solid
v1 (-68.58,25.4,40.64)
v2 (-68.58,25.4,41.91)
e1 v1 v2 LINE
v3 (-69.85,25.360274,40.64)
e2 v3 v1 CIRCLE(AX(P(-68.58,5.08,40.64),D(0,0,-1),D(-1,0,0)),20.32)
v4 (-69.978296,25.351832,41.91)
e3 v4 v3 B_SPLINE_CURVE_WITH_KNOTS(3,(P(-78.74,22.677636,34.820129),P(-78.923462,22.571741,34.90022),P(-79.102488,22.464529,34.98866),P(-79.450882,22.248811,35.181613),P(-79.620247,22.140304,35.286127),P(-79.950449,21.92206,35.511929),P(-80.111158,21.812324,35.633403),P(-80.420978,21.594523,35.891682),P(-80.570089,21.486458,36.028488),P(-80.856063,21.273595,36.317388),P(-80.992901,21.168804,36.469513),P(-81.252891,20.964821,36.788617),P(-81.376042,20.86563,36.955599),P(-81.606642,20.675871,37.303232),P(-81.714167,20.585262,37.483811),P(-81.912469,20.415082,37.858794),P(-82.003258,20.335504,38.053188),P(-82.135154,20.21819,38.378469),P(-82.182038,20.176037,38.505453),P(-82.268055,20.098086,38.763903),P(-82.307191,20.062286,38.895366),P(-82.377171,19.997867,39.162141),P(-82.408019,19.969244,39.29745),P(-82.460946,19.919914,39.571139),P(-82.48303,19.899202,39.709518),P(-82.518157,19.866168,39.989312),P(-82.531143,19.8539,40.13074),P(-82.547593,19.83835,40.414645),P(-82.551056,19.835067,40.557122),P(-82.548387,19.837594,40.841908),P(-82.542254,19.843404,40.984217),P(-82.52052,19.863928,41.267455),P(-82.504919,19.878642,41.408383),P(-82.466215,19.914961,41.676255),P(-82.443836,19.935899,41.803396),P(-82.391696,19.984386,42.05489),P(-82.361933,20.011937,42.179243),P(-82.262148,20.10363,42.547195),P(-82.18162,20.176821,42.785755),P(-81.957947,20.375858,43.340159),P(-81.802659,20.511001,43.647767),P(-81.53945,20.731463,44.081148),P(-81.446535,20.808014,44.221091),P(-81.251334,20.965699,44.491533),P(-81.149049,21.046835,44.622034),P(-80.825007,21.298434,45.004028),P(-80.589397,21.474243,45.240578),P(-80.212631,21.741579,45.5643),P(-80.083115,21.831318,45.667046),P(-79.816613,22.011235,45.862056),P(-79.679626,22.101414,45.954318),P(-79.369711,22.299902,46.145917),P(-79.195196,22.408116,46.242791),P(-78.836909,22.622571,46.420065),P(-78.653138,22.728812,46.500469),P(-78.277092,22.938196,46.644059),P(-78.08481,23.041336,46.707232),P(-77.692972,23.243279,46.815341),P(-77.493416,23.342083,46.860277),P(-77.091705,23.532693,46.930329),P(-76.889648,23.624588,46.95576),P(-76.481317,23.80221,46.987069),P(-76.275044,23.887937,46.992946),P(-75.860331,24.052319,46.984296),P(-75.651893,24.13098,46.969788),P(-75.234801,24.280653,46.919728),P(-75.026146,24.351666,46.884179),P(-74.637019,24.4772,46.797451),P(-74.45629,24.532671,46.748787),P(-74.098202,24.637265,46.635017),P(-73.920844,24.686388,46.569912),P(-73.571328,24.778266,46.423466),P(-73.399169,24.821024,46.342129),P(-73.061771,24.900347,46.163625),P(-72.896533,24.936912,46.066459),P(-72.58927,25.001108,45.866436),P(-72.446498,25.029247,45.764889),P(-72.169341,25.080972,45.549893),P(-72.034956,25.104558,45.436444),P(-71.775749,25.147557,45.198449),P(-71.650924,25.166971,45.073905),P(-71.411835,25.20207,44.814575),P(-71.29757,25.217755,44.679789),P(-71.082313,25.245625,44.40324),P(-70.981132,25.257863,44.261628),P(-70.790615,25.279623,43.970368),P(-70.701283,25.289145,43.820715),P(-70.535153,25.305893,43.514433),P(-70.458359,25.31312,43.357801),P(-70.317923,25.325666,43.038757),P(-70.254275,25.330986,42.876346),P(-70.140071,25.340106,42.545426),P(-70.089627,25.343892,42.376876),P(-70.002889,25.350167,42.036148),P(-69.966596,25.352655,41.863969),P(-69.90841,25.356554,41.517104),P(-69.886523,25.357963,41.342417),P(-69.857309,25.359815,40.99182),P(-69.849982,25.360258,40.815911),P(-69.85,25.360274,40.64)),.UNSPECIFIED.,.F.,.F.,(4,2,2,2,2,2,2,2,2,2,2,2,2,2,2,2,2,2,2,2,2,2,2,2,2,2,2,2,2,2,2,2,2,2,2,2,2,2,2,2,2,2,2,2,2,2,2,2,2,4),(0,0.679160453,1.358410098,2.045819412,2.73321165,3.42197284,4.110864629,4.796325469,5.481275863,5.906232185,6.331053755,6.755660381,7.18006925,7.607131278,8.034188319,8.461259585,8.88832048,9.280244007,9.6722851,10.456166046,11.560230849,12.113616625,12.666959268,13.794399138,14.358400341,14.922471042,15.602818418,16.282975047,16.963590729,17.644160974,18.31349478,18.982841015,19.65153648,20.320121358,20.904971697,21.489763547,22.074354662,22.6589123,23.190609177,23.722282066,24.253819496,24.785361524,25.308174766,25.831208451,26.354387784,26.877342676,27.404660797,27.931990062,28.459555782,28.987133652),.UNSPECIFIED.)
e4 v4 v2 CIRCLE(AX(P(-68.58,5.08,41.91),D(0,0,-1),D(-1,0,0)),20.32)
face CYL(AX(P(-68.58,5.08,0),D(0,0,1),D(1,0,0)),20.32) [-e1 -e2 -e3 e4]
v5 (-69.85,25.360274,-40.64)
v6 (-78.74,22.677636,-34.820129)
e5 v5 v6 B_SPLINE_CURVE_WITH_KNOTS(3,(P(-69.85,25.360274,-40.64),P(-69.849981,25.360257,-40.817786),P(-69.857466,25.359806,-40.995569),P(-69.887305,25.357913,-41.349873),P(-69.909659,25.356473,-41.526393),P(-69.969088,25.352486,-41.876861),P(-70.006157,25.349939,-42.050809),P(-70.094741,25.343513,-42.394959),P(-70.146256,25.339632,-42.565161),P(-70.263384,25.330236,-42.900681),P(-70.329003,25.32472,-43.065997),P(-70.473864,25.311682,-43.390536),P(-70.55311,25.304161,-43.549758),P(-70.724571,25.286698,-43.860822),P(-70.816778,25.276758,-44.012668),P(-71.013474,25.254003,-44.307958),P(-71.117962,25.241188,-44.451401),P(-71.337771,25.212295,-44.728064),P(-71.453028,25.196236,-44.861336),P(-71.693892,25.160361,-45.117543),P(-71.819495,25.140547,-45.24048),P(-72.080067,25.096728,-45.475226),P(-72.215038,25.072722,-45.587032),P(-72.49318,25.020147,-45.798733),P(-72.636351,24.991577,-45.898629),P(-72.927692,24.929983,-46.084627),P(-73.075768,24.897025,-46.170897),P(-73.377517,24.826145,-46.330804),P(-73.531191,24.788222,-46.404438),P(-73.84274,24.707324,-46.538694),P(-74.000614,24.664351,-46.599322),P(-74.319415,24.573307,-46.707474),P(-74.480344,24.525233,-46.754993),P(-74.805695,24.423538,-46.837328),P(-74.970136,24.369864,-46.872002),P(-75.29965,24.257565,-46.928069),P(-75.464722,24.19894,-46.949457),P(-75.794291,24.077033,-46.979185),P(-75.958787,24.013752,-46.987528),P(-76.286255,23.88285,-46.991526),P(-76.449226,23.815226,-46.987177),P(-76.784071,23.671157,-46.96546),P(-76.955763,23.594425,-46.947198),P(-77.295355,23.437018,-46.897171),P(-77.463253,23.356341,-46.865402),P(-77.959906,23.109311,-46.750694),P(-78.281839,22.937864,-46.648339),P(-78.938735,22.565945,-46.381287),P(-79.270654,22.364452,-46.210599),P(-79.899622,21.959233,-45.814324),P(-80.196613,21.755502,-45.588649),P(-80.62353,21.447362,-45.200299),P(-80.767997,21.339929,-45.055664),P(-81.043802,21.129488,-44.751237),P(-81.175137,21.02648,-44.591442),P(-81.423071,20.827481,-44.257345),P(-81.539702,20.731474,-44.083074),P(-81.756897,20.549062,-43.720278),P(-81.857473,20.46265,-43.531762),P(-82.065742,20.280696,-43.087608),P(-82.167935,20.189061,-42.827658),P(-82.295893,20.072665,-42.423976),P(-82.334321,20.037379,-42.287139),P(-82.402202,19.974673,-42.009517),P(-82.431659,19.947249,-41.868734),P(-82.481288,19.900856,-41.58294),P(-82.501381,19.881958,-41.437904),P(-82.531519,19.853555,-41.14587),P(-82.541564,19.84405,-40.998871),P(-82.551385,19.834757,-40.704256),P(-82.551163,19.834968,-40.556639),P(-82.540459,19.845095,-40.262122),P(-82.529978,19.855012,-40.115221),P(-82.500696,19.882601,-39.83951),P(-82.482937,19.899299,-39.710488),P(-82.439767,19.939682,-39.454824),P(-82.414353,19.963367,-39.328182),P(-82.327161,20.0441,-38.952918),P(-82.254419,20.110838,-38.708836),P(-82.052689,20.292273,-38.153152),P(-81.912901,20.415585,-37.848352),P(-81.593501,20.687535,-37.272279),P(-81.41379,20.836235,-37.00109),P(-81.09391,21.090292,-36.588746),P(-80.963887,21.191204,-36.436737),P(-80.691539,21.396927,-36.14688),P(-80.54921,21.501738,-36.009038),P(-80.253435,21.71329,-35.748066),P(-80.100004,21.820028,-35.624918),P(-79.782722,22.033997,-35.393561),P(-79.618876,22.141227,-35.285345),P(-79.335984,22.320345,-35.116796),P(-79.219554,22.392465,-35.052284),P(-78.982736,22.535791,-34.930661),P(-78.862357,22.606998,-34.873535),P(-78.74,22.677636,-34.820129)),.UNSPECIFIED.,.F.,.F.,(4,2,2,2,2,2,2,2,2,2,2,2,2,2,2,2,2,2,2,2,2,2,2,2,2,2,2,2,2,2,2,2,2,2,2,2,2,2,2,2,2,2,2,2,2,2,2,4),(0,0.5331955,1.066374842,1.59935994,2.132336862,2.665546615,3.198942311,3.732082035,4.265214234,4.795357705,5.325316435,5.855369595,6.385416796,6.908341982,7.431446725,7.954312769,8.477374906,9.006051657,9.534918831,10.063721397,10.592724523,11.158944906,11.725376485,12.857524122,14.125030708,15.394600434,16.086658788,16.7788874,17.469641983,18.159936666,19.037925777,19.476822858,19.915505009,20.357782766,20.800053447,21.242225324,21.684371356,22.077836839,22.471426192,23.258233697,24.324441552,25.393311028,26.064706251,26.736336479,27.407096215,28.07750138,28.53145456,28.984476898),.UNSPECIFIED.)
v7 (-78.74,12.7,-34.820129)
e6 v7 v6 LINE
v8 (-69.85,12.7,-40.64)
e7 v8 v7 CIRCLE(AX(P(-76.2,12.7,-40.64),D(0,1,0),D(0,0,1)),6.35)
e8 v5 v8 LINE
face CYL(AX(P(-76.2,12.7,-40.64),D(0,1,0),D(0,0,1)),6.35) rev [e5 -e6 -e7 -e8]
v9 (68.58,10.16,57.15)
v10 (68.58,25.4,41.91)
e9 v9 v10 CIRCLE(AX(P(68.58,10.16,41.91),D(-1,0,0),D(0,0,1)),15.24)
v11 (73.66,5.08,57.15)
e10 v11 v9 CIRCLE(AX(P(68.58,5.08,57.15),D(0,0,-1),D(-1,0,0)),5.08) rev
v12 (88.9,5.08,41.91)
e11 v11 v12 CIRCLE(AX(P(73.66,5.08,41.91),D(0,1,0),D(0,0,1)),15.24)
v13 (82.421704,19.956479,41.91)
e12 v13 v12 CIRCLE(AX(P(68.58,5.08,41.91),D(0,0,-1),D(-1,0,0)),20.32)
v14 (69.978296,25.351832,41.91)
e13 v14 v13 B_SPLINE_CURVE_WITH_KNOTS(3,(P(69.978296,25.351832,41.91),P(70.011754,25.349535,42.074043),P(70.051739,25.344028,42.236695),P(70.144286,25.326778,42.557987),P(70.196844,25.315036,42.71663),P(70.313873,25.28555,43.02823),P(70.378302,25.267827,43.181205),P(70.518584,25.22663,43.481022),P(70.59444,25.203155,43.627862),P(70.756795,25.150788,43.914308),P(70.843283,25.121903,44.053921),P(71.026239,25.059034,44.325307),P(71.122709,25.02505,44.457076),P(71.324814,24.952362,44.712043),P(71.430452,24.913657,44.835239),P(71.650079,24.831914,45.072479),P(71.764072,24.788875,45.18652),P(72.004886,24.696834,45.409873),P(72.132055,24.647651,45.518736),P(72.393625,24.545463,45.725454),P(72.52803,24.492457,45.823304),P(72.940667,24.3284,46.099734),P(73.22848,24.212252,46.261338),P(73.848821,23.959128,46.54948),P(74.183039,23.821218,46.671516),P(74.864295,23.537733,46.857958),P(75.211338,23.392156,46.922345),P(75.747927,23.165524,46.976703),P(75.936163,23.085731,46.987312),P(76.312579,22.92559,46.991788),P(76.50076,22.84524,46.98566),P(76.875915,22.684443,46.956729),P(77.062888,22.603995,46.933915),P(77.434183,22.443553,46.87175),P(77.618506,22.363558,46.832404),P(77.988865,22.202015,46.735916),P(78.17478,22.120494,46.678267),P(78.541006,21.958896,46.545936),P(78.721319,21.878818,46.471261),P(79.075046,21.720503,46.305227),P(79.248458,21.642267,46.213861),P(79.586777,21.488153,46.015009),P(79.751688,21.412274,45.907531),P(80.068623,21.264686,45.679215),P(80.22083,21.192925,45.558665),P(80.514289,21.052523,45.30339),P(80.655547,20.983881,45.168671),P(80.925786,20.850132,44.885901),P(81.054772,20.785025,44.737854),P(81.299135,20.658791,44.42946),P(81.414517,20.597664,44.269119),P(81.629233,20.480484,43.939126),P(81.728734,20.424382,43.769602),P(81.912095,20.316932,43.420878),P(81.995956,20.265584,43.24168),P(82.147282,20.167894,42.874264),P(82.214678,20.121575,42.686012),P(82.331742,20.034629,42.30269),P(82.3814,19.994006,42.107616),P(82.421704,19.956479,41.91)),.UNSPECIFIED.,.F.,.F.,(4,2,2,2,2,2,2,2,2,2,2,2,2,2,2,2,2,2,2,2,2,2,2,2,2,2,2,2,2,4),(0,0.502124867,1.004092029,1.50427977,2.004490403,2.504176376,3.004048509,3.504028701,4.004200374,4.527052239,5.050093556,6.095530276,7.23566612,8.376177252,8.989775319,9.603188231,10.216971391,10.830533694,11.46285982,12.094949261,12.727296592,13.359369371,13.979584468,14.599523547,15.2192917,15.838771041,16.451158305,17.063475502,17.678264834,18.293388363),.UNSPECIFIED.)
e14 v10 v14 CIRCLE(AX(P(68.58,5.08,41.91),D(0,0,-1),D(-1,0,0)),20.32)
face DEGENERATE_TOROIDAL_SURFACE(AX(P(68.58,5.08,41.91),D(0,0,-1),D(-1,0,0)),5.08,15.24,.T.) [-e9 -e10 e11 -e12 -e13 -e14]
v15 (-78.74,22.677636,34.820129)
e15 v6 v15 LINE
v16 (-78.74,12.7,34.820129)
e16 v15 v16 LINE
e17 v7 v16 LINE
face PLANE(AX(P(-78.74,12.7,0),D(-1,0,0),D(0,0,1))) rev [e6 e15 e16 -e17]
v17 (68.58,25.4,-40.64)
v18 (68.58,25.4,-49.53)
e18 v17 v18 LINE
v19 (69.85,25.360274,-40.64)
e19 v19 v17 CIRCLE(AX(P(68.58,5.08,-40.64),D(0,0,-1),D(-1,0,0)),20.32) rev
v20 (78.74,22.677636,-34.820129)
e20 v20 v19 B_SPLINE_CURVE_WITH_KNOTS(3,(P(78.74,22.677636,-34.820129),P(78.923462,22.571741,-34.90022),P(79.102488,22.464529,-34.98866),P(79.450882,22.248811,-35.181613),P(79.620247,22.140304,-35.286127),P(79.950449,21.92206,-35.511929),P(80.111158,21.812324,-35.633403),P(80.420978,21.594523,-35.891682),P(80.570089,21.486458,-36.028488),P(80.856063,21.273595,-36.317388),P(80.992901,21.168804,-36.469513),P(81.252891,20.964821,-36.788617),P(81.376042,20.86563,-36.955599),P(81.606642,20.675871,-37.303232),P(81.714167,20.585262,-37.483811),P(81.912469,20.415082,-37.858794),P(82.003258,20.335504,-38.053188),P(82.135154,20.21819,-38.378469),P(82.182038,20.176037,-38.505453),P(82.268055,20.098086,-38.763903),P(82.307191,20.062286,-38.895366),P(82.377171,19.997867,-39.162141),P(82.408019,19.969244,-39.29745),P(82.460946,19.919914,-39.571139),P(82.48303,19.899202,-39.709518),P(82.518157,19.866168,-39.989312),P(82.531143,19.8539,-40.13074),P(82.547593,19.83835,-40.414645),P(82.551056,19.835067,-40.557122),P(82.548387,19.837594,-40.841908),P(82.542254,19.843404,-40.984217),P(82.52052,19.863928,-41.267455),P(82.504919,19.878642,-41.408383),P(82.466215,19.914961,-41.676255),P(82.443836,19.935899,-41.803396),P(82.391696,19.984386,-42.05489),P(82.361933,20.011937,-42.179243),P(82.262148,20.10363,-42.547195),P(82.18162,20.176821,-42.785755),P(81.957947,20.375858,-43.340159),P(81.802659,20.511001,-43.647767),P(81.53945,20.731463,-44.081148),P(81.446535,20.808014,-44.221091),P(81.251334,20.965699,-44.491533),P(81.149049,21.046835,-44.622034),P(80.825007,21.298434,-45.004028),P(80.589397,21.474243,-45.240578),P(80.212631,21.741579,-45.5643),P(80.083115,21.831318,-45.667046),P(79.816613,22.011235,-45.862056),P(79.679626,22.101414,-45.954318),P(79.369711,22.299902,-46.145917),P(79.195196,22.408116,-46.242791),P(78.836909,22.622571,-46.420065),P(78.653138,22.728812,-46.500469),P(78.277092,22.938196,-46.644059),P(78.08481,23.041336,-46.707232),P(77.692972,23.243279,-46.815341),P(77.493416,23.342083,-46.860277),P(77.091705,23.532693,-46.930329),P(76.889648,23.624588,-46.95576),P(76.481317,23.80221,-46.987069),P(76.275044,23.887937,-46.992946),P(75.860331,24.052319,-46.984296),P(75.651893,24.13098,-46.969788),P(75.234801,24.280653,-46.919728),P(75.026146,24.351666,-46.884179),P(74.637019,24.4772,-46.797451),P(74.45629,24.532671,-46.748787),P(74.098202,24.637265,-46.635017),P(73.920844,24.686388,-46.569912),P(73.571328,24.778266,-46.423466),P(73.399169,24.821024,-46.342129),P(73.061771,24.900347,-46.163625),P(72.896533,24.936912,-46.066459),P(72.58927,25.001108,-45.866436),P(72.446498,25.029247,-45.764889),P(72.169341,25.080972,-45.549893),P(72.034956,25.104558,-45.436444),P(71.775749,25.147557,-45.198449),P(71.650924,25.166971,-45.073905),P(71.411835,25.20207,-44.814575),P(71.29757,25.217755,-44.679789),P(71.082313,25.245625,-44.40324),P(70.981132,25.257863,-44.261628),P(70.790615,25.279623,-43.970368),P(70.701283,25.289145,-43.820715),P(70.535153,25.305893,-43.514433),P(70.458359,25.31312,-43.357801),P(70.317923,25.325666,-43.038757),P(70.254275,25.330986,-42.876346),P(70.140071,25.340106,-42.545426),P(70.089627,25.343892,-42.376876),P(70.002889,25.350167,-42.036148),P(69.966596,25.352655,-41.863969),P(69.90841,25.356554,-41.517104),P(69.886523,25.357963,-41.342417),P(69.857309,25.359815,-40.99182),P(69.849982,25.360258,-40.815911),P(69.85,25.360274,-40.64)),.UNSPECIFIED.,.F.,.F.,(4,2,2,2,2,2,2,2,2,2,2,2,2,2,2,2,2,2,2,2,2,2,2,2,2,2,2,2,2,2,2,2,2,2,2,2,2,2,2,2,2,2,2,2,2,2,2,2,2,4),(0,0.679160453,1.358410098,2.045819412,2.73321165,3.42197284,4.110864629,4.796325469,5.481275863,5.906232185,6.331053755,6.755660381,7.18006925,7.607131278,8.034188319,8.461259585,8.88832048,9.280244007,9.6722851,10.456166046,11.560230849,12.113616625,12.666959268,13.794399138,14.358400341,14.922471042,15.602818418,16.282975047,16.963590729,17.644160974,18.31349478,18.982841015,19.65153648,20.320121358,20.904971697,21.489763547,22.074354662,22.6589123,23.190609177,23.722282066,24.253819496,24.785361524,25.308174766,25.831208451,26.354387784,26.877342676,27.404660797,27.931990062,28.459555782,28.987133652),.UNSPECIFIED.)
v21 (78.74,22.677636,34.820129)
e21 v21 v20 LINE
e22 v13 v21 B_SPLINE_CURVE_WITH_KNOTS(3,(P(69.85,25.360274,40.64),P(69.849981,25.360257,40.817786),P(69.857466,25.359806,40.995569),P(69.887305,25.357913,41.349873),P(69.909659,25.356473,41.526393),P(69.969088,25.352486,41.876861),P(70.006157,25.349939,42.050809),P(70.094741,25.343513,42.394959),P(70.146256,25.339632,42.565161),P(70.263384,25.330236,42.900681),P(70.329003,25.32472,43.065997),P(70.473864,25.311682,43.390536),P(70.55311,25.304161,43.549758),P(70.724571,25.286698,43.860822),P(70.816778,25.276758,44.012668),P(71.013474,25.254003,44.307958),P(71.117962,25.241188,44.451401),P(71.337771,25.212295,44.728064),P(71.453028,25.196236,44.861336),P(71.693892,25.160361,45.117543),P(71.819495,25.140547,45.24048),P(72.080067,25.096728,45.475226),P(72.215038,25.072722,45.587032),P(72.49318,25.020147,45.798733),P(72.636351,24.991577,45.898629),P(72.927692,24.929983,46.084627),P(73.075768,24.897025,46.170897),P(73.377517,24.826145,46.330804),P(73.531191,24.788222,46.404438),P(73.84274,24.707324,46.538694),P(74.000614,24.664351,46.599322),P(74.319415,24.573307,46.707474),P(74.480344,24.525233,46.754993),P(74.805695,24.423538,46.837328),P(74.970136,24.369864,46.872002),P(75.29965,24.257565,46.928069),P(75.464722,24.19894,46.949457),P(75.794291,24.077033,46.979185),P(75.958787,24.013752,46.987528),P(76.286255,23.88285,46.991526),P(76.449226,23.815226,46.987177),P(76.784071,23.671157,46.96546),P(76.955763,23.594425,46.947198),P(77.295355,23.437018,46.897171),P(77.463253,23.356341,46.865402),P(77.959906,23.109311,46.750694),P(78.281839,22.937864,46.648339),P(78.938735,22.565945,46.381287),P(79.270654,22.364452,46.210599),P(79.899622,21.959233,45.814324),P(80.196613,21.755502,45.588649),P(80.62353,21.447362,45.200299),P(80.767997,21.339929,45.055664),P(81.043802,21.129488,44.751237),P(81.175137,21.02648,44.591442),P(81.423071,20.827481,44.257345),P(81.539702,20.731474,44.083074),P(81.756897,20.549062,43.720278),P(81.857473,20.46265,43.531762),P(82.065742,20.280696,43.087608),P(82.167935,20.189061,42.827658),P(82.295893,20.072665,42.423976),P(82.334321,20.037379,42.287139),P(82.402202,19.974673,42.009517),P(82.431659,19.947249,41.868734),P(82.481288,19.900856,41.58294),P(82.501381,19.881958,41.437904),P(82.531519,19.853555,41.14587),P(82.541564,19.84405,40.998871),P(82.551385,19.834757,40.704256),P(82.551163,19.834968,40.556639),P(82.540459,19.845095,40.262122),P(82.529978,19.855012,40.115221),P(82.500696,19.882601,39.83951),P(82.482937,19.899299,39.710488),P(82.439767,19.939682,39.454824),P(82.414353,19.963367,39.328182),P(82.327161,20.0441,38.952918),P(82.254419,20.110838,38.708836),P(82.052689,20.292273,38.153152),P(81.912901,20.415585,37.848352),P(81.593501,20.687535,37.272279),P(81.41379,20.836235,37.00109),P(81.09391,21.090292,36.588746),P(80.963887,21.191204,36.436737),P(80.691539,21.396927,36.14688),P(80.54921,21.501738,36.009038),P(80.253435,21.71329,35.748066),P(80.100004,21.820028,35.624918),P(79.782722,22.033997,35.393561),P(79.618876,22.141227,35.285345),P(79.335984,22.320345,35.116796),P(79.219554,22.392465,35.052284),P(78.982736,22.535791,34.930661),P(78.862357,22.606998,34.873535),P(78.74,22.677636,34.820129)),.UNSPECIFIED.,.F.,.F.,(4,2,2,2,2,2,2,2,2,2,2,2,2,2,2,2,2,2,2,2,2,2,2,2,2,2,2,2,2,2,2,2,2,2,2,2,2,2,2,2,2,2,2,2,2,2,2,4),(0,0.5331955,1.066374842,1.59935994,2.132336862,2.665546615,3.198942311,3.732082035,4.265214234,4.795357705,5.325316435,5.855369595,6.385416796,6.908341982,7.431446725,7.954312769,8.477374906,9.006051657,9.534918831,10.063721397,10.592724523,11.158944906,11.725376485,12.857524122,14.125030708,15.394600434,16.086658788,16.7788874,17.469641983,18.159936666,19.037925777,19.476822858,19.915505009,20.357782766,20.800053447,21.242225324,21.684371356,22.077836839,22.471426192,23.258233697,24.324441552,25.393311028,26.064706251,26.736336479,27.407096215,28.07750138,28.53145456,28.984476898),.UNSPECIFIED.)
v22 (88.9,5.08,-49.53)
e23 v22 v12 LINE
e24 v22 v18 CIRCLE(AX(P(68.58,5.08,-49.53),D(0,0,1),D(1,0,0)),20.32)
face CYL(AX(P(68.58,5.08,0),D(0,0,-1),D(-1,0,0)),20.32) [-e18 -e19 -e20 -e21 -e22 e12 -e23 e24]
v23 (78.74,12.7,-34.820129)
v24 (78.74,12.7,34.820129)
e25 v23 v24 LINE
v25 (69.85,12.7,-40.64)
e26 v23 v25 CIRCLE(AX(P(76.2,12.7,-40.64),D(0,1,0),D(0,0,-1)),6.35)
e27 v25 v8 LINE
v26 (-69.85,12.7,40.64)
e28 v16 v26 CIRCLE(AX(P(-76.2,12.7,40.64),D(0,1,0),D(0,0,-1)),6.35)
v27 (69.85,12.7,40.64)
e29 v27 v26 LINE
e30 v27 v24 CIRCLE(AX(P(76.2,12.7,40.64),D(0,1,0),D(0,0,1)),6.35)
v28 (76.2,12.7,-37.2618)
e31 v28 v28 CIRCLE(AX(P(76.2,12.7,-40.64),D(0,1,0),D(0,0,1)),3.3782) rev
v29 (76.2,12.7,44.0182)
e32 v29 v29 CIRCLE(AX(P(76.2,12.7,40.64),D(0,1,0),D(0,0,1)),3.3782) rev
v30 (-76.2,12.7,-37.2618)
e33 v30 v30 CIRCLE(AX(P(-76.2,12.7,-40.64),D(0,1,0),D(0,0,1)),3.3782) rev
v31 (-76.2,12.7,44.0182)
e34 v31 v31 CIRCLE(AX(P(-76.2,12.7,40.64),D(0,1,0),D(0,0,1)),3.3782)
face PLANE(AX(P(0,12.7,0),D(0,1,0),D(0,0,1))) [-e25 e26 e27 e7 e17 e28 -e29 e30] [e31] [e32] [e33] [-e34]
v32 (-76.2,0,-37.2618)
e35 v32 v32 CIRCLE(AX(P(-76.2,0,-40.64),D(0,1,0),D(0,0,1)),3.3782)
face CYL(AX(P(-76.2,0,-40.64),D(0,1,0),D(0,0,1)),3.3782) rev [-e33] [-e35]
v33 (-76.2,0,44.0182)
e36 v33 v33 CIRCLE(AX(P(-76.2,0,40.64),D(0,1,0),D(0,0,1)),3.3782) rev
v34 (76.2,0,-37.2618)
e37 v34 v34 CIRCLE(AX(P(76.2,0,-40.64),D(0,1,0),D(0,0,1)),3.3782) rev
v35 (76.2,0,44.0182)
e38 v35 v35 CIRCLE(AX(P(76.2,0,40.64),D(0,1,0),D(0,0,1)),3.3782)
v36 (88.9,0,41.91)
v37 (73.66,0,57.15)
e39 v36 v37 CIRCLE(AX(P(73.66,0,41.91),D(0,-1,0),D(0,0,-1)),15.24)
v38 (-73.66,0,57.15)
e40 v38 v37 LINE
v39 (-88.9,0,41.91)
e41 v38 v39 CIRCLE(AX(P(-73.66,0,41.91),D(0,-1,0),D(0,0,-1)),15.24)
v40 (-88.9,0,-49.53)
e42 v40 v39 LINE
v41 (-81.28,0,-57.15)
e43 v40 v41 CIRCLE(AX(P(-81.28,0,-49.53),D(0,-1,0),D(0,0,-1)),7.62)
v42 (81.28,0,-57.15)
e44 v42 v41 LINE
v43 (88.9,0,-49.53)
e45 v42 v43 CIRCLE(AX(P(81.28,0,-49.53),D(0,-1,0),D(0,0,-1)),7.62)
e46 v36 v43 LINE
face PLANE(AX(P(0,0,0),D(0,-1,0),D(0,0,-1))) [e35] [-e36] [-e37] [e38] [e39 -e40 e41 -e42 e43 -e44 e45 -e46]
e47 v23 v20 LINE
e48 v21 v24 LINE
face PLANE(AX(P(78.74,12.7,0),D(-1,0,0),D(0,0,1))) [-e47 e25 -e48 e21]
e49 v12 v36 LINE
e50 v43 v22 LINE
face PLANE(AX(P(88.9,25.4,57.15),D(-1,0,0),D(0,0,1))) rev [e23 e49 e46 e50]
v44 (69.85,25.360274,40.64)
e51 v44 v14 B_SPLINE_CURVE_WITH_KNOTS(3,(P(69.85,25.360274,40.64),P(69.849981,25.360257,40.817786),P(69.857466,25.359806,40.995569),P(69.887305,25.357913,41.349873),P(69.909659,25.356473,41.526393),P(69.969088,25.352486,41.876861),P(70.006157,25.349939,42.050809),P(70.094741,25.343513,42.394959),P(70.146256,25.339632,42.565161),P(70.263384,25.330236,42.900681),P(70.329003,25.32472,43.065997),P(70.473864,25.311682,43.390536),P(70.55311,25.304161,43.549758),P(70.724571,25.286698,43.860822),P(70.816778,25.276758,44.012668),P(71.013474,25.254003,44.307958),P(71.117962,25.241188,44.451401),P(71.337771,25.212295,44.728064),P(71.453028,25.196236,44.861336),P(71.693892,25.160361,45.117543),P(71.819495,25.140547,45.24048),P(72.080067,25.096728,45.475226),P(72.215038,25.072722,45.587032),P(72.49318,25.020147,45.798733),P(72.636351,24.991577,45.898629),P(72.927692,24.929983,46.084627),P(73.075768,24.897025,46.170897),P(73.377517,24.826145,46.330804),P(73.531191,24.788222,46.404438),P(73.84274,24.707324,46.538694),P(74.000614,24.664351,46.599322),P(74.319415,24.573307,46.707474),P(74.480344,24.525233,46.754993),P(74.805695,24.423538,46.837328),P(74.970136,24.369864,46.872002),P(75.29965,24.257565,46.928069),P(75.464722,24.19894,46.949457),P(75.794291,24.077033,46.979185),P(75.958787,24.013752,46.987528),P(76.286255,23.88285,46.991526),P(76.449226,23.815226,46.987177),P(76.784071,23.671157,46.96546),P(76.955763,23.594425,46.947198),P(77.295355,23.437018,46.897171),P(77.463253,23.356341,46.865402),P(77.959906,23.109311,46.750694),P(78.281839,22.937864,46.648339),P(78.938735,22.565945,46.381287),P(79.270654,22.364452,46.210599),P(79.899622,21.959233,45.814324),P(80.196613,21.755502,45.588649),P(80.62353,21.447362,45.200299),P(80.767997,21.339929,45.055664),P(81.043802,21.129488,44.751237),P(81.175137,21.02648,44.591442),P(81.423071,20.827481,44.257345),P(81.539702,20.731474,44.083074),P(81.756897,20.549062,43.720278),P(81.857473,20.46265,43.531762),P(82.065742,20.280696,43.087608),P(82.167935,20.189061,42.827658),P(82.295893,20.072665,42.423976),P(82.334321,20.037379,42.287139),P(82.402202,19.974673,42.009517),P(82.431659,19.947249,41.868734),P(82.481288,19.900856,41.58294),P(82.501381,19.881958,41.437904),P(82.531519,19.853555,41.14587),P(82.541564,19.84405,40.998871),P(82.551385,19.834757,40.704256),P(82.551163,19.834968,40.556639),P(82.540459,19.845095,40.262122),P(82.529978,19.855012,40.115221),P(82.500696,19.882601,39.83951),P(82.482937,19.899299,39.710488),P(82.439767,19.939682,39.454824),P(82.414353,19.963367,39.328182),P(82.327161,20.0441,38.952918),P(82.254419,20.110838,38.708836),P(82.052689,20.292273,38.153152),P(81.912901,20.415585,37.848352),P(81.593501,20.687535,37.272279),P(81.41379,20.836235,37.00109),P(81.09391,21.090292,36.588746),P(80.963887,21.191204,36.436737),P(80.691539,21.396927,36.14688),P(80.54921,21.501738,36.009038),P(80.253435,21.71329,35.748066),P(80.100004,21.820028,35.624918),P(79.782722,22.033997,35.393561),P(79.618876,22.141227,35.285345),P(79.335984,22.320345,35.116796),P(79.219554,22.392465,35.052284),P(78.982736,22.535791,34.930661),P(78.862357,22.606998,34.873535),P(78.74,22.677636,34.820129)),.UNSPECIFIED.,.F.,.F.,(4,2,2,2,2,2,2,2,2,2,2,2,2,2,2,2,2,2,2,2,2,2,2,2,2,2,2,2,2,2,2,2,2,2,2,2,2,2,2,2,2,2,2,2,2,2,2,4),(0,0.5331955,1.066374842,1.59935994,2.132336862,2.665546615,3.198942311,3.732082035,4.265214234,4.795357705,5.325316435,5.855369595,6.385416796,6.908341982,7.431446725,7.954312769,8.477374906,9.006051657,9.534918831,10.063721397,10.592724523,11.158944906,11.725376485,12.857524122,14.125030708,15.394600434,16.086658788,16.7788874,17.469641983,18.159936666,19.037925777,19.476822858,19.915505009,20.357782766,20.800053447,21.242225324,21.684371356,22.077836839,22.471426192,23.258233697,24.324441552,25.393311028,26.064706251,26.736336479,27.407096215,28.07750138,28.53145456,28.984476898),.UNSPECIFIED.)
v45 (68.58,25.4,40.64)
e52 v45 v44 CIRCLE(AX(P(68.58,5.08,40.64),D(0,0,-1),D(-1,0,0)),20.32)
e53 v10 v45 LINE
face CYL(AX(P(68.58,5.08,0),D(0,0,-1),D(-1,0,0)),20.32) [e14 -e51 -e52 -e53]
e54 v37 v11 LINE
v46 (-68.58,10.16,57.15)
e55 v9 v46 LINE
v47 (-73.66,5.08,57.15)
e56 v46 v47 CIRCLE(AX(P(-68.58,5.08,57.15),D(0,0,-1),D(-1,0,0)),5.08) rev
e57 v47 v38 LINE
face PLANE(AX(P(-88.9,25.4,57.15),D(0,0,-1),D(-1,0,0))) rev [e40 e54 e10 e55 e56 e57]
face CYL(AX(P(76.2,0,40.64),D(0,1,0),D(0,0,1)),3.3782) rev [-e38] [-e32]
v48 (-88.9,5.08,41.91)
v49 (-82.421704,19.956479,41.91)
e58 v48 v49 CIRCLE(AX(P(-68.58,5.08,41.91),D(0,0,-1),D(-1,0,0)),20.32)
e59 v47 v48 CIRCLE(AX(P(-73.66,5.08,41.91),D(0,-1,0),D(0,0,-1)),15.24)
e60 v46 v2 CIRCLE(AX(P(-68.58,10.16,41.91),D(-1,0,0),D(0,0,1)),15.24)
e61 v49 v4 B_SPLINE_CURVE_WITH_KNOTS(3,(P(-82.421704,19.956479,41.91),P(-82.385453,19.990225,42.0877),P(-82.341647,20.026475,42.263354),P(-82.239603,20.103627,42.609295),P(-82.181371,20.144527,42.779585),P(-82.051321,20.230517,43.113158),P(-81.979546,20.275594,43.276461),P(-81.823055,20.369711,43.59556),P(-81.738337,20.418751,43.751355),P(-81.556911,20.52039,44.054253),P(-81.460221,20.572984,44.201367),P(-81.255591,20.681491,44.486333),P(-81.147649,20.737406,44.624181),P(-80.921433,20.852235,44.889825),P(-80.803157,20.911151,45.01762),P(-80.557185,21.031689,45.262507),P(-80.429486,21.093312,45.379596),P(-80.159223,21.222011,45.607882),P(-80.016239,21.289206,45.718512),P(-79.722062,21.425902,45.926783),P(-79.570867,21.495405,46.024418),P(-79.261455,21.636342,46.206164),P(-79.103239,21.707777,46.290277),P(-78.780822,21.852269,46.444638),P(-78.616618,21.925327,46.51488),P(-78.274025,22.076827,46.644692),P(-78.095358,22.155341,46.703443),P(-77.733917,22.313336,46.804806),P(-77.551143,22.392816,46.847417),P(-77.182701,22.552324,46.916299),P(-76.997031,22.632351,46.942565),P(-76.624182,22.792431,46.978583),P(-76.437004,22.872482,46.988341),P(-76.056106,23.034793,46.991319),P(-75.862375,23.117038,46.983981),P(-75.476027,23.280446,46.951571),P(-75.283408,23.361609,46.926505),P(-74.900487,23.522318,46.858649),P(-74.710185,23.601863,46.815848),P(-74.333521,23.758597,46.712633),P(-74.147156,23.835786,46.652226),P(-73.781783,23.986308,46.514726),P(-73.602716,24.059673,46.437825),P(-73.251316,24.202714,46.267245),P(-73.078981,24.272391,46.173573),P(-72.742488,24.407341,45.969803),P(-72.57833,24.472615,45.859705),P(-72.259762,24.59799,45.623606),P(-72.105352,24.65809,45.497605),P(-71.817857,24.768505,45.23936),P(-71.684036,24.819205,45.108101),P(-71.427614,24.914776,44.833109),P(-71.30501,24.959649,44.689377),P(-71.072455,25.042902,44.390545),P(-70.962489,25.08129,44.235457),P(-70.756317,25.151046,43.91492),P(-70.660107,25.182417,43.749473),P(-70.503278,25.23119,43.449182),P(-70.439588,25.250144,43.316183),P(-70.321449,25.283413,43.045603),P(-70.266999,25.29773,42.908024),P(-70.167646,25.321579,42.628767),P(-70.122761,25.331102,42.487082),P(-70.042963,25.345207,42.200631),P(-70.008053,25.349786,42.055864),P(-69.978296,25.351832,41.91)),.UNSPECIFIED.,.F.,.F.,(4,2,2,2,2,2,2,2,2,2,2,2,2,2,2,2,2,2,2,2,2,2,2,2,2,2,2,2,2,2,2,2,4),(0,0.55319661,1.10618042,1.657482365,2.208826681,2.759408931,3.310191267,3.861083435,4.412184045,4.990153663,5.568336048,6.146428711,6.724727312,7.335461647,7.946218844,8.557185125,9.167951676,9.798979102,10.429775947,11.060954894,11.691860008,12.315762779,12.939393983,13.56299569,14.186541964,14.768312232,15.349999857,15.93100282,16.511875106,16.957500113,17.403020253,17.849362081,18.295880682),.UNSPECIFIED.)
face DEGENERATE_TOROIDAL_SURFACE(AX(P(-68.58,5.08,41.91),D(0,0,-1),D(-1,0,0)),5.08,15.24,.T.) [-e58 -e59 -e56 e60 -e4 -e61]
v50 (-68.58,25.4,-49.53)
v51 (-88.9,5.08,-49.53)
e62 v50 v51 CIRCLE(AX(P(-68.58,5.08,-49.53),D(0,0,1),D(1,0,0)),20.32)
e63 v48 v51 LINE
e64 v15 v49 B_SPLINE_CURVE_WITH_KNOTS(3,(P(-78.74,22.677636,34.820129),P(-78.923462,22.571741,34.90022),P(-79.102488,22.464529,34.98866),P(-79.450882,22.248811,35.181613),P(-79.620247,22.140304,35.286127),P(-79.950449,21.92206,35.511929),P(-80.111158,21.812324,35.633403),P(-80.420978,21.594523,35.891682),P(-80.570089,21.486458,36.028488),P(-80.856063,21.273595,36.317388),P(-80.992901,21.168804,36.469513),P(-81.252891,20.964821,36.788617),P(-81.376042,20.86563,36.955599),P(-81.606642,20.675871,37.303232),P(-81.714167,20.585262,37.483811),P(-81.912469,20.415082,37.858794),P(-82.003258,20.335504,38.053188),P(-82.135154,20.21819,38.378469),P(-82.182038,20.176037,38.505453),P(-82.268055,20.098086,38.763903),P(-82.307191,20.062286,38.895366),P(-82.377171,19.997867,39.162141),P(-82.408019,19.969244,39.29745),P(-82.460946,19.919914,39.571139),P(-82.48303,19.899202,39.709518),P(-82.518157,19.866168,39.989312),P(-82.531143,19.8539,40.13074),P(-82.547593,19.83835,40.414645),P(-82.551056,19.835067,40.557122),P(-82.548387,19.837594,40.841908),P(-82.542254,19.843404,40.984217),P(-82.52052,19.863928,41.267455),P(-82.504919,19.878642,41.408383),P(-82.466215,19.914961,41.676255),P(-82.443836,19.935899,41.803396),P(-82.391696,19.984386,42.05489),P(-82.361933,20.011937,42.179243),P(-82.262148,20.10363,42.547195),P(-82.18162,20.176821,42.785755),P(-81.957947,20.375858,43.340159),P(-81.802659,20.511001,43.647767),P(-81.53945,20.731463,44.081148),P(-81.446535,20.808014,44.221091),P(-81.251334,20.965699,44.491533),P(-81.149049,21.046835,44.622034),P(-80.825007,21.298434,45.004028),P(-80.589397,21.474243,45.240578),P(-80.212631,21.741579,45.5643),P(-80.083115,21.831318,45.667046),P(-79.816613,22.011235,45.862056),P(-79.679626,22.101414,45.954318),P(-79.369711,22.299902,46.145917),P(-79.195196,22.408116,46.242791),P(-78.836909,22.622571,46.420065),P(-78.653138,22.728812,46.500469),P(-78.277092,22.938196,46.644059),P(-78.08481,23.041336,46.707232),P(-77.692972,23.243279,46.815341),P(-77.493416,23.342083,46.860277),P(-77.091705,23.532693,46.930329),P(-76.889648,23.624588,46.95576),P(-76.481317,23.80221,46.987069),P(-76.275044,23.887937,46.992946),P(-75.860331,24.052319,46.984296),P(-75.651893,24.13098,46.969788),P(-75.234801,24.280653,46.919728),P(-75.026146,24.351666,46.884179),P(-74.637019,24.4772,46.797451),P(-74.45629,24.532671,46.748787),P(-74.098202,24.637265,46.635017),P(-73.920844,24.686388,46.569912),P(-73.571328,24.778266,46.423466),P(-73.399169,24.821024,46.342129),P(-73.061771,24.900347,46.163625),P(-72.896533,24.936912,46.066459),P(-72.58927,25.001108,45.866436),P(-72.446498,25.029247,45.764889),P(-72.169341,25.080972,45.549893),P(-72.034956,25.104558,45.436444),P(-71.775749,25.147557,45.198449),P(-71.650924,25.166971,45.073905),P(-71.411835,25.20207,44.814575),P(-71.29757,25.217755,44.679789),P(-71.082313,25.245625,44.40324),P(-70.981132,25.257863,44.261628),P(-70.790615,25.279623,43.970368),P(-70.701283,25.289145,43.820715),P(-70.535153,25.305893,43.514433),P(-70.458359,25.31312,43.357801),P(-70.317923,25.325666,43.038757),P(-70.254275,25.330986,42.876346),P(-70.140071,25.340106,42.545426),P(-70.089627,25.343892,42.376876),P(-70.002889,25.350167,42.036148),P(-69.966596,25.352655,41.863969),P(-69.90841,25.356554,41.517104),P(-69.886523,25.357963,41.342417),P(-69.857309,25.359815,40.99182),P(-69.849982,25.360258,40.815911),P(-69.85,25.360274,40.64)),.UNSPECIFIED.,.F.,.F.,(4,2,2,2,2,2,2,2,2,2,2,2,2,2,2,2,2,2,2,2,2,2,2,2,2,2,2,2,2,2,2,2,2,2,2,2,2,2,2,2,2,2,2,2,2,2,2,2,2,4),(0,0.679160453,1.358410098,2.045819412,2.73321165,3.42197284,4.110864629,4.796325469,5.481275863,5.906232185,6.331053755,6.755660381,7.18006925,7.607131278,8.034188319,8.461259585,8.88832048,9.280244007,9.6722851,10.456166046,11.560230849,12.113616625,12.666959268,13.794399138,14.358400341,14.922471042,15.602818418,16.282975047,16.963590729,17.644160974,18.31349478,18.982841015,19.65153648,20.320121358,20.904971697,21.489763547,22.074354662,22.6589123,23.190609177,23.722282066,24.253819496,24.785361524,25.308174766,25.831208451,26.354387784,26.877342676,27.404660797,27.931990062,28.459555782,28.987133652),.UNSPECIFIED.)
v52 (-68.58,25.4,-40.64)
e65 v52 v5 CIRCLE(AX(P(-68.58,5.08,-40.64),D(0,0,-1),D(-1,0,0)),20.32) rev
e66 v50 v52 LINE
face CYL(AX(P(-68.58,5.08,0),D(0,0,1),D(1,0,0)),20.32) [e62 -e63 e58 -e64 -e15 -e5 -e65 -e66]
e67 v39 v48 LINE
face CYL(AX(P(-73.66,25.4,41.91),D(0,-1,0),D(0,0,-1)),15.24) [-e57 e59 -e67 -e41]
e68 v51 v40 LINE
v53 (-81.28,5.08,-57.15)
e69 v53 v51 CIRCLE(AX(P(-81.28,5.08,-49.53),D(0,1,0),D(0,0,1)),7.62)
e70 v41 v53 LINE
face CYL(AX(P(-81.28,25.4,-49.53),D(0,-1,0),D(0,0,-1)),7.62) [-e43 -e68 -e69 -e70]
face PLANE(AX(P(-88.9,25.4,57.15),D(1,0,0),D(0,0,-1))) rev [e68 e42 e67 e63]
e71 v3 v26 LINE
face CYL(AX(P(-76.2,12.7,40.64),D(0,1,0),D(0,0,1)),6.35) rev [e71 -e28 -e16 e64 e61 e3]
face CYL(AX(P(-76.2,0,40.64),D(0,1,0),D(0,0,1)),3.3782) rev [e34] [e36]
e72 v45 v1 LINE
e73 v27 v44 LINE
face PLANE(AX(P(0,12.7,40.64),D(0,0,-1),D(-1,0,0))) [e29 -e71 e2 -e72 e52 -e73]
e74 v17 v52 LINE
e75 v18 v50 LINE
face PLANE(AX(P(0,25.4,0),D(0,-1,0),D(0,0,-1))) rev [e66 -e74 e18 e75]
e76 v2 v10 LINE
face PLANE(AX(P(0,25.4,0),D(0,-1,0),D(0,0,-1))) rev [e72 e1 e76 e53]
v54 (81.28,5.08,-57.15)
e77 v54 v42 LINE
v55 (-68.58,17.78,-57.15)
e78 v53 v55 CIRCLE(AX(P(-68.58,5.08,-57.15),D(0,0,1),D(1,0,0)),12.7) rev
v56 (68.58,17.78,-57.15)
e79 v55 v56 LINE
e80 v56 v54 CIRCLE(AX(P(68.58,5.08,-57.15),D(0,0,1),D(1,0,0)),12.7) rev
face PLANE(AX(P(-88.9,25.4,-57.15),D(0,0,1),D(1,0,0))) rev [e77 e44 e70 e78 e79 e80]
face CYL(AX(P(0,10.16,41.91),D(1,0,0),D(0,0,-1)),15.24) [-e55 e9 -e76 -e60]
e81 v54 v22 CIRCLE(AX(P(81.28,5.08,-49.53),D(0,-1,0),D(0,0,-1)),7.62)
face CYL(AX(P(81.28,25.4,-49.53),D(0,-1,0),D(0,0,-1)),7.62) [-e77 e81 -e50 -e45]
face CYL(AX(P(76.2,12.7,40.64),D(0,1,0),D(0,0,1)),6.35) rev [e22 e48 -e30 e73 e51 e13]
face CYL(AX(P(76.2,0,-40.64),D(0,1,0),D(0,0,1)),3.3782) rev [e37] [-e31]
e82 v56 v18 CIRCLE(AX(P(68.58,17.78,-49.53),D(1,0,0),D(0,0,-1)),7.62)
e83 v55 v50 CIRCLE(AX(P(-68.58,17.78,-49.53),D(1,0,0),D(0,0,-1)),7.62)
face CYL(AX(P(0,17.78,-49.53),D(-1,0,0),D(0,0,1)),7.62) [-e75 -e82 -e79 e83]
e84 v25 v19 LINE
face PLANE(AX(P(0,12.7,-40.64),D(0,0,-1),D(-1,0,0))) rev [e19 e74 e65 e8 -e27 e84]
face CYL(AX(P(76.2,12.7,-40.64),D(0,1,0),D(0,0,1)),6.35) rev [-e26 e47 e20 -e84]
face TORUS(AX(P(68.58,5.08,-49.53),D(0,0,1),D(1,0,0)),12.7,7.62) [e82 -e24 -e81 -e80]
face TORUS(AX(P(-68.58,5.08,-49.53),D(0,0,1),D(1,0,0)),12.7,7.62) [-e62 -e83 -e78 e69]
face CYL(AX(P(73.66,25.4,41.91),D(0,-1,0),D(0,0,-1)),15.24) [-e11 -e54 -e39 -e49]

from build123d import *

# Parameters (mm, degrees)
SKETCH1_W           = 177.8
SKETCH1_H           = 114.3
BOSS_EXTRUDE1_DEPTH = 25.4
SKETCH3_R           = 3.3782
CUT_EXTRUDE2_DEPTH  = 109.694491581
SKETCH4_W           = 157.48
SKETCH4_H           = 81.28
CUT_EXTRUDE3_DEPTH  = 12.7
SKETCH3_3_R         = 6.35
SKETCH3_3_R_2       = 3.3782
CUT_EXTRUDE4_DEPTH  = 12.7
FILLET4_R           = 20.32
FILLET7_R           = 15.24
FILLET8_R           = 7.62


with BuildPart() as part:
    # Sketch1 → Boss-Extrude1 (new body)
    with BuildSketch(Plane(origin=(0, 0, 0), x_dir=(1, 0, 0), z_dir=(0, 1, 0))):
        Rectangle(SKETCH1_W, SKETCH1_H)
    extrude(amount=BOSS_EXTRUDE1_DEPTH)

    # Sketch3 → Cut-Extrude2 (cut, through all)
    with BuildSketch(Plane(origin=(0, 25.4, 0), x_dir=(1, 0, 0), z_dir=(0, 1, 0))):
        with Locations(Location((76.2, -40.64, 0), (0, 0, 270))):
            Circle(SKETCH3_R)
        with Locations(Location((76.2, 40.64, 0), (0, 0, 270))):
            Circle(SKETCH3_R)
        with Locations(Location((-76.2, -40.64, 0), (0, 0, 270))):
            Circle(SKETCH3_R)
        with Locations(Location((-76.2, 40.64, 0), (0, 0, 270))):
            Circle(SKETCH3_R)
    extrude(amount=-CUT_EXTRUDE2_DEPTH, mode=Mode.SUBTRACT)

    # Sketch4 → Cut-Extrude3 (cut)
    with BuildSketch(Plane(origin=(0, 25.4, 0), x_dir=(1, 0, 0), z_dir=(0, 1, 0))):
        Rectangle(SKETCH4_W, SKETCH4_H)
    extrude(amount=-CUT_EXTRUDE3_DEPTH, mode=Mode.SUBTRACT)

    # Sketch3<3> → Cut-Extrude4 (cut)
    # profile 1 of 4: a face of its own
    with BuildSketch(Plane(origin=(0, 25.4, 0), x_dir=(1, 0, 0), z_dir=(0, 1, 0))):
        with Locations((76.2, 40.64)):
            Circle(SKETCH3_3_R)
        with Locations(Location((76.2, 40.64, 0), (0, 0, 270))):
            Circle(SKETCH3_3_R_2, mode=Mode.SUBTRACT)
    # profile 2 of 4: a face of its own
    with BuildSketch(Plane(origin=(0, 25.4, 0), x_dir=(1, 0, 0), z_dir=(0, 1, 0))):
        with Locations((76.2, -40.64)):
            Circle(SKETCH3_3_R)
        with Locations(Location((76.2, -40.64, 0), (0, 0, 270))):
            Circle(SKETCH3_3_R_2, mode=Mode.SUBTRACT)
    # profile 3 of 4: a face of its own
    with BuildSketch(Plane(origin=(0, 25.4, 0), x_dir=(1, 0, 0), z_dir=(0, 1, 0))):
        with Locations((-76.2, -40.64)):
            Circle(SKETCH3_3_R)
        with Locations(Location((-76.2, -40.64, 0), (0, 0, 270))):
            Circle(SKETCH3_3_R_2, mode=Mode.SUBTRACT)
    # profile 4 of 4: a face of its own
    with BuildSketch(Plane(origin=(0, 25.4, 0), x_dir=(1, 0, 0), z_dir=(0, 1, 0))):
        with Locations((-76.2, 40.64)):
            Circle(SKETCH3_3_R)
        with Locations(Location((-76.2, 40.64, 0), (0, 0, 270))):
            Circle(SKETCH3_3_R_2, mode=Mode.SUBTRACT)
    extrude(amount=-CUT_EXTRUDE4_DEPTH, mode=Mode.SUBTRACT)

    # Fillet4
    # the kernel refuses this fillet: 20.32 mm, written as the material it takes off along each edge
    with BuildSketch(Plane(origin=(88.9, 25.4, 107.95), x_dir=(-1, 0, 0), z_dir=(0, 0, -1)), Plane(origin=(-88.9, 25.4, -107.95), x_dir=(1, 0, 0), z_dir=(0, 0, 1))) as fillet4_piece_1:
        with BuildLine():
            CenterArc((FILLET4_R, -FILLET4_R), FILLET4_R, 90, 90)
            Line((0, -FILLET4_R), (0, 0))
            Line((0, 0), (FILLET4_R, 0))
        make_face()
    extrude(amount=215.9, mode=Mode.SUBTRACT)

    # Fillet7
    # the kernel refuses this fillet: 15.24 mm, written as the material it takes off along each edge
    with BuildSketch(Plane(origin=(-68.58, 25.4, 57.15), x_dir=(0, -1, 0), z_dir=(1, 0, 0))) as fillet7_piece_1:
        with BuildLine():
            CenterArc((FILLET7_R, FILLET7_R), FILLET7_R, 180, 90)
            Line((0, FILLET7_R), (0, 0))
            Line((0, 0), (FILLET7_R, 0))
        make_face()
    extrude(amount=137.16, mode=Mode.SUBTRACT)
    with BuildSketch(Plane(origin=(88.9, -38.1, 57.15), x_dir=(-1, 0, 0), z_dir=(0, 1, 0))) as fillet7_piece_2:
        with BuildLine():
            CenterArc((FILLET7_R, -FILLET7_R), FILLET7_R, 90, 90)
            Line((0, -FILLET7_R), (0, 0))
            Line((0, 0), (FILLET7_R, 0))
        make_face()
    extrude(amount=43.18, mode=Mode.SUBTRACT)
    with BuildSketch(Plane(origin=(-88.9, -38.1, 57.15), x_dir=(1, 0, 0), z_dir=(0, 1, 0))) as fillet7_piece_3:
        with BuildLine():
            CenterArc((FILLET7_R, FILLET7_R), FILLET7_R, 180, 90)
            Line((0, FILLET7_R), (0, 0))
            Line((0, 0), (FILLET7_R, 0))
        make_face()
    extrude(amount=43.18, mode=Mode.SUBTRACT)
    with BuildSketch(Plane(origin=(-68.58, 5.08, 57.15), x_dir=(-1, 0, 0), z_dir=(0, -1, 0))) as fillet7_piece_4:
        with BuildLine():
            CenterArc((20.32 - FILLET7_R, FILLET7_R), FILLET7_R, 270, 90)
            Line((20.32, FILLET7_R), (20.32, 0))
            Line((20.32, 0), (20.32 - FILLET7_R, 0))
        make_face()
    revolve(axis=Axis((-68.58, 5.08, 57.15), (0, 0, -1)), revolution_arc=90, mode=Mode.SUBTRACT)
    with BuildSketch(Plane(origin=(68.58, 5.08, 57.15), x_dir=(1, 0, 0), z_dir=(0, -1, 0))) as fillet7_piece_5:
        with BuildLine():
            CenterArc((20.32 - FILLET7_R, -FILLET7_R), FILLET7_R, 0, 90)
            Line((20.32, -FILLET7_R), (20.32, 0))
            Line((20.32, 0), (20.32 - FILLET7_R, 0))
        make_face()
    revolve(axis=Axis((68.58, 5.08, 57.15), (0, 0, 1)), revolution_arc=90, mode=Mode.SUBTRACT)

    # Fillet8
    fillet8_edges = [part.edges().sort_by_distance(p)[0] for p in [
        (0, 25.4, -57.15),
        (-88.9, 2.54, -57.15),
        (88.9, 2.54, -57.15),
        (-82.948409794, 19.448409794, -57.15),
        (82.948409794, 19.448409794, -57.15),
    ]]
    fillet(fillet8_edges, radius=FILLET8_R)


solid = part.part
